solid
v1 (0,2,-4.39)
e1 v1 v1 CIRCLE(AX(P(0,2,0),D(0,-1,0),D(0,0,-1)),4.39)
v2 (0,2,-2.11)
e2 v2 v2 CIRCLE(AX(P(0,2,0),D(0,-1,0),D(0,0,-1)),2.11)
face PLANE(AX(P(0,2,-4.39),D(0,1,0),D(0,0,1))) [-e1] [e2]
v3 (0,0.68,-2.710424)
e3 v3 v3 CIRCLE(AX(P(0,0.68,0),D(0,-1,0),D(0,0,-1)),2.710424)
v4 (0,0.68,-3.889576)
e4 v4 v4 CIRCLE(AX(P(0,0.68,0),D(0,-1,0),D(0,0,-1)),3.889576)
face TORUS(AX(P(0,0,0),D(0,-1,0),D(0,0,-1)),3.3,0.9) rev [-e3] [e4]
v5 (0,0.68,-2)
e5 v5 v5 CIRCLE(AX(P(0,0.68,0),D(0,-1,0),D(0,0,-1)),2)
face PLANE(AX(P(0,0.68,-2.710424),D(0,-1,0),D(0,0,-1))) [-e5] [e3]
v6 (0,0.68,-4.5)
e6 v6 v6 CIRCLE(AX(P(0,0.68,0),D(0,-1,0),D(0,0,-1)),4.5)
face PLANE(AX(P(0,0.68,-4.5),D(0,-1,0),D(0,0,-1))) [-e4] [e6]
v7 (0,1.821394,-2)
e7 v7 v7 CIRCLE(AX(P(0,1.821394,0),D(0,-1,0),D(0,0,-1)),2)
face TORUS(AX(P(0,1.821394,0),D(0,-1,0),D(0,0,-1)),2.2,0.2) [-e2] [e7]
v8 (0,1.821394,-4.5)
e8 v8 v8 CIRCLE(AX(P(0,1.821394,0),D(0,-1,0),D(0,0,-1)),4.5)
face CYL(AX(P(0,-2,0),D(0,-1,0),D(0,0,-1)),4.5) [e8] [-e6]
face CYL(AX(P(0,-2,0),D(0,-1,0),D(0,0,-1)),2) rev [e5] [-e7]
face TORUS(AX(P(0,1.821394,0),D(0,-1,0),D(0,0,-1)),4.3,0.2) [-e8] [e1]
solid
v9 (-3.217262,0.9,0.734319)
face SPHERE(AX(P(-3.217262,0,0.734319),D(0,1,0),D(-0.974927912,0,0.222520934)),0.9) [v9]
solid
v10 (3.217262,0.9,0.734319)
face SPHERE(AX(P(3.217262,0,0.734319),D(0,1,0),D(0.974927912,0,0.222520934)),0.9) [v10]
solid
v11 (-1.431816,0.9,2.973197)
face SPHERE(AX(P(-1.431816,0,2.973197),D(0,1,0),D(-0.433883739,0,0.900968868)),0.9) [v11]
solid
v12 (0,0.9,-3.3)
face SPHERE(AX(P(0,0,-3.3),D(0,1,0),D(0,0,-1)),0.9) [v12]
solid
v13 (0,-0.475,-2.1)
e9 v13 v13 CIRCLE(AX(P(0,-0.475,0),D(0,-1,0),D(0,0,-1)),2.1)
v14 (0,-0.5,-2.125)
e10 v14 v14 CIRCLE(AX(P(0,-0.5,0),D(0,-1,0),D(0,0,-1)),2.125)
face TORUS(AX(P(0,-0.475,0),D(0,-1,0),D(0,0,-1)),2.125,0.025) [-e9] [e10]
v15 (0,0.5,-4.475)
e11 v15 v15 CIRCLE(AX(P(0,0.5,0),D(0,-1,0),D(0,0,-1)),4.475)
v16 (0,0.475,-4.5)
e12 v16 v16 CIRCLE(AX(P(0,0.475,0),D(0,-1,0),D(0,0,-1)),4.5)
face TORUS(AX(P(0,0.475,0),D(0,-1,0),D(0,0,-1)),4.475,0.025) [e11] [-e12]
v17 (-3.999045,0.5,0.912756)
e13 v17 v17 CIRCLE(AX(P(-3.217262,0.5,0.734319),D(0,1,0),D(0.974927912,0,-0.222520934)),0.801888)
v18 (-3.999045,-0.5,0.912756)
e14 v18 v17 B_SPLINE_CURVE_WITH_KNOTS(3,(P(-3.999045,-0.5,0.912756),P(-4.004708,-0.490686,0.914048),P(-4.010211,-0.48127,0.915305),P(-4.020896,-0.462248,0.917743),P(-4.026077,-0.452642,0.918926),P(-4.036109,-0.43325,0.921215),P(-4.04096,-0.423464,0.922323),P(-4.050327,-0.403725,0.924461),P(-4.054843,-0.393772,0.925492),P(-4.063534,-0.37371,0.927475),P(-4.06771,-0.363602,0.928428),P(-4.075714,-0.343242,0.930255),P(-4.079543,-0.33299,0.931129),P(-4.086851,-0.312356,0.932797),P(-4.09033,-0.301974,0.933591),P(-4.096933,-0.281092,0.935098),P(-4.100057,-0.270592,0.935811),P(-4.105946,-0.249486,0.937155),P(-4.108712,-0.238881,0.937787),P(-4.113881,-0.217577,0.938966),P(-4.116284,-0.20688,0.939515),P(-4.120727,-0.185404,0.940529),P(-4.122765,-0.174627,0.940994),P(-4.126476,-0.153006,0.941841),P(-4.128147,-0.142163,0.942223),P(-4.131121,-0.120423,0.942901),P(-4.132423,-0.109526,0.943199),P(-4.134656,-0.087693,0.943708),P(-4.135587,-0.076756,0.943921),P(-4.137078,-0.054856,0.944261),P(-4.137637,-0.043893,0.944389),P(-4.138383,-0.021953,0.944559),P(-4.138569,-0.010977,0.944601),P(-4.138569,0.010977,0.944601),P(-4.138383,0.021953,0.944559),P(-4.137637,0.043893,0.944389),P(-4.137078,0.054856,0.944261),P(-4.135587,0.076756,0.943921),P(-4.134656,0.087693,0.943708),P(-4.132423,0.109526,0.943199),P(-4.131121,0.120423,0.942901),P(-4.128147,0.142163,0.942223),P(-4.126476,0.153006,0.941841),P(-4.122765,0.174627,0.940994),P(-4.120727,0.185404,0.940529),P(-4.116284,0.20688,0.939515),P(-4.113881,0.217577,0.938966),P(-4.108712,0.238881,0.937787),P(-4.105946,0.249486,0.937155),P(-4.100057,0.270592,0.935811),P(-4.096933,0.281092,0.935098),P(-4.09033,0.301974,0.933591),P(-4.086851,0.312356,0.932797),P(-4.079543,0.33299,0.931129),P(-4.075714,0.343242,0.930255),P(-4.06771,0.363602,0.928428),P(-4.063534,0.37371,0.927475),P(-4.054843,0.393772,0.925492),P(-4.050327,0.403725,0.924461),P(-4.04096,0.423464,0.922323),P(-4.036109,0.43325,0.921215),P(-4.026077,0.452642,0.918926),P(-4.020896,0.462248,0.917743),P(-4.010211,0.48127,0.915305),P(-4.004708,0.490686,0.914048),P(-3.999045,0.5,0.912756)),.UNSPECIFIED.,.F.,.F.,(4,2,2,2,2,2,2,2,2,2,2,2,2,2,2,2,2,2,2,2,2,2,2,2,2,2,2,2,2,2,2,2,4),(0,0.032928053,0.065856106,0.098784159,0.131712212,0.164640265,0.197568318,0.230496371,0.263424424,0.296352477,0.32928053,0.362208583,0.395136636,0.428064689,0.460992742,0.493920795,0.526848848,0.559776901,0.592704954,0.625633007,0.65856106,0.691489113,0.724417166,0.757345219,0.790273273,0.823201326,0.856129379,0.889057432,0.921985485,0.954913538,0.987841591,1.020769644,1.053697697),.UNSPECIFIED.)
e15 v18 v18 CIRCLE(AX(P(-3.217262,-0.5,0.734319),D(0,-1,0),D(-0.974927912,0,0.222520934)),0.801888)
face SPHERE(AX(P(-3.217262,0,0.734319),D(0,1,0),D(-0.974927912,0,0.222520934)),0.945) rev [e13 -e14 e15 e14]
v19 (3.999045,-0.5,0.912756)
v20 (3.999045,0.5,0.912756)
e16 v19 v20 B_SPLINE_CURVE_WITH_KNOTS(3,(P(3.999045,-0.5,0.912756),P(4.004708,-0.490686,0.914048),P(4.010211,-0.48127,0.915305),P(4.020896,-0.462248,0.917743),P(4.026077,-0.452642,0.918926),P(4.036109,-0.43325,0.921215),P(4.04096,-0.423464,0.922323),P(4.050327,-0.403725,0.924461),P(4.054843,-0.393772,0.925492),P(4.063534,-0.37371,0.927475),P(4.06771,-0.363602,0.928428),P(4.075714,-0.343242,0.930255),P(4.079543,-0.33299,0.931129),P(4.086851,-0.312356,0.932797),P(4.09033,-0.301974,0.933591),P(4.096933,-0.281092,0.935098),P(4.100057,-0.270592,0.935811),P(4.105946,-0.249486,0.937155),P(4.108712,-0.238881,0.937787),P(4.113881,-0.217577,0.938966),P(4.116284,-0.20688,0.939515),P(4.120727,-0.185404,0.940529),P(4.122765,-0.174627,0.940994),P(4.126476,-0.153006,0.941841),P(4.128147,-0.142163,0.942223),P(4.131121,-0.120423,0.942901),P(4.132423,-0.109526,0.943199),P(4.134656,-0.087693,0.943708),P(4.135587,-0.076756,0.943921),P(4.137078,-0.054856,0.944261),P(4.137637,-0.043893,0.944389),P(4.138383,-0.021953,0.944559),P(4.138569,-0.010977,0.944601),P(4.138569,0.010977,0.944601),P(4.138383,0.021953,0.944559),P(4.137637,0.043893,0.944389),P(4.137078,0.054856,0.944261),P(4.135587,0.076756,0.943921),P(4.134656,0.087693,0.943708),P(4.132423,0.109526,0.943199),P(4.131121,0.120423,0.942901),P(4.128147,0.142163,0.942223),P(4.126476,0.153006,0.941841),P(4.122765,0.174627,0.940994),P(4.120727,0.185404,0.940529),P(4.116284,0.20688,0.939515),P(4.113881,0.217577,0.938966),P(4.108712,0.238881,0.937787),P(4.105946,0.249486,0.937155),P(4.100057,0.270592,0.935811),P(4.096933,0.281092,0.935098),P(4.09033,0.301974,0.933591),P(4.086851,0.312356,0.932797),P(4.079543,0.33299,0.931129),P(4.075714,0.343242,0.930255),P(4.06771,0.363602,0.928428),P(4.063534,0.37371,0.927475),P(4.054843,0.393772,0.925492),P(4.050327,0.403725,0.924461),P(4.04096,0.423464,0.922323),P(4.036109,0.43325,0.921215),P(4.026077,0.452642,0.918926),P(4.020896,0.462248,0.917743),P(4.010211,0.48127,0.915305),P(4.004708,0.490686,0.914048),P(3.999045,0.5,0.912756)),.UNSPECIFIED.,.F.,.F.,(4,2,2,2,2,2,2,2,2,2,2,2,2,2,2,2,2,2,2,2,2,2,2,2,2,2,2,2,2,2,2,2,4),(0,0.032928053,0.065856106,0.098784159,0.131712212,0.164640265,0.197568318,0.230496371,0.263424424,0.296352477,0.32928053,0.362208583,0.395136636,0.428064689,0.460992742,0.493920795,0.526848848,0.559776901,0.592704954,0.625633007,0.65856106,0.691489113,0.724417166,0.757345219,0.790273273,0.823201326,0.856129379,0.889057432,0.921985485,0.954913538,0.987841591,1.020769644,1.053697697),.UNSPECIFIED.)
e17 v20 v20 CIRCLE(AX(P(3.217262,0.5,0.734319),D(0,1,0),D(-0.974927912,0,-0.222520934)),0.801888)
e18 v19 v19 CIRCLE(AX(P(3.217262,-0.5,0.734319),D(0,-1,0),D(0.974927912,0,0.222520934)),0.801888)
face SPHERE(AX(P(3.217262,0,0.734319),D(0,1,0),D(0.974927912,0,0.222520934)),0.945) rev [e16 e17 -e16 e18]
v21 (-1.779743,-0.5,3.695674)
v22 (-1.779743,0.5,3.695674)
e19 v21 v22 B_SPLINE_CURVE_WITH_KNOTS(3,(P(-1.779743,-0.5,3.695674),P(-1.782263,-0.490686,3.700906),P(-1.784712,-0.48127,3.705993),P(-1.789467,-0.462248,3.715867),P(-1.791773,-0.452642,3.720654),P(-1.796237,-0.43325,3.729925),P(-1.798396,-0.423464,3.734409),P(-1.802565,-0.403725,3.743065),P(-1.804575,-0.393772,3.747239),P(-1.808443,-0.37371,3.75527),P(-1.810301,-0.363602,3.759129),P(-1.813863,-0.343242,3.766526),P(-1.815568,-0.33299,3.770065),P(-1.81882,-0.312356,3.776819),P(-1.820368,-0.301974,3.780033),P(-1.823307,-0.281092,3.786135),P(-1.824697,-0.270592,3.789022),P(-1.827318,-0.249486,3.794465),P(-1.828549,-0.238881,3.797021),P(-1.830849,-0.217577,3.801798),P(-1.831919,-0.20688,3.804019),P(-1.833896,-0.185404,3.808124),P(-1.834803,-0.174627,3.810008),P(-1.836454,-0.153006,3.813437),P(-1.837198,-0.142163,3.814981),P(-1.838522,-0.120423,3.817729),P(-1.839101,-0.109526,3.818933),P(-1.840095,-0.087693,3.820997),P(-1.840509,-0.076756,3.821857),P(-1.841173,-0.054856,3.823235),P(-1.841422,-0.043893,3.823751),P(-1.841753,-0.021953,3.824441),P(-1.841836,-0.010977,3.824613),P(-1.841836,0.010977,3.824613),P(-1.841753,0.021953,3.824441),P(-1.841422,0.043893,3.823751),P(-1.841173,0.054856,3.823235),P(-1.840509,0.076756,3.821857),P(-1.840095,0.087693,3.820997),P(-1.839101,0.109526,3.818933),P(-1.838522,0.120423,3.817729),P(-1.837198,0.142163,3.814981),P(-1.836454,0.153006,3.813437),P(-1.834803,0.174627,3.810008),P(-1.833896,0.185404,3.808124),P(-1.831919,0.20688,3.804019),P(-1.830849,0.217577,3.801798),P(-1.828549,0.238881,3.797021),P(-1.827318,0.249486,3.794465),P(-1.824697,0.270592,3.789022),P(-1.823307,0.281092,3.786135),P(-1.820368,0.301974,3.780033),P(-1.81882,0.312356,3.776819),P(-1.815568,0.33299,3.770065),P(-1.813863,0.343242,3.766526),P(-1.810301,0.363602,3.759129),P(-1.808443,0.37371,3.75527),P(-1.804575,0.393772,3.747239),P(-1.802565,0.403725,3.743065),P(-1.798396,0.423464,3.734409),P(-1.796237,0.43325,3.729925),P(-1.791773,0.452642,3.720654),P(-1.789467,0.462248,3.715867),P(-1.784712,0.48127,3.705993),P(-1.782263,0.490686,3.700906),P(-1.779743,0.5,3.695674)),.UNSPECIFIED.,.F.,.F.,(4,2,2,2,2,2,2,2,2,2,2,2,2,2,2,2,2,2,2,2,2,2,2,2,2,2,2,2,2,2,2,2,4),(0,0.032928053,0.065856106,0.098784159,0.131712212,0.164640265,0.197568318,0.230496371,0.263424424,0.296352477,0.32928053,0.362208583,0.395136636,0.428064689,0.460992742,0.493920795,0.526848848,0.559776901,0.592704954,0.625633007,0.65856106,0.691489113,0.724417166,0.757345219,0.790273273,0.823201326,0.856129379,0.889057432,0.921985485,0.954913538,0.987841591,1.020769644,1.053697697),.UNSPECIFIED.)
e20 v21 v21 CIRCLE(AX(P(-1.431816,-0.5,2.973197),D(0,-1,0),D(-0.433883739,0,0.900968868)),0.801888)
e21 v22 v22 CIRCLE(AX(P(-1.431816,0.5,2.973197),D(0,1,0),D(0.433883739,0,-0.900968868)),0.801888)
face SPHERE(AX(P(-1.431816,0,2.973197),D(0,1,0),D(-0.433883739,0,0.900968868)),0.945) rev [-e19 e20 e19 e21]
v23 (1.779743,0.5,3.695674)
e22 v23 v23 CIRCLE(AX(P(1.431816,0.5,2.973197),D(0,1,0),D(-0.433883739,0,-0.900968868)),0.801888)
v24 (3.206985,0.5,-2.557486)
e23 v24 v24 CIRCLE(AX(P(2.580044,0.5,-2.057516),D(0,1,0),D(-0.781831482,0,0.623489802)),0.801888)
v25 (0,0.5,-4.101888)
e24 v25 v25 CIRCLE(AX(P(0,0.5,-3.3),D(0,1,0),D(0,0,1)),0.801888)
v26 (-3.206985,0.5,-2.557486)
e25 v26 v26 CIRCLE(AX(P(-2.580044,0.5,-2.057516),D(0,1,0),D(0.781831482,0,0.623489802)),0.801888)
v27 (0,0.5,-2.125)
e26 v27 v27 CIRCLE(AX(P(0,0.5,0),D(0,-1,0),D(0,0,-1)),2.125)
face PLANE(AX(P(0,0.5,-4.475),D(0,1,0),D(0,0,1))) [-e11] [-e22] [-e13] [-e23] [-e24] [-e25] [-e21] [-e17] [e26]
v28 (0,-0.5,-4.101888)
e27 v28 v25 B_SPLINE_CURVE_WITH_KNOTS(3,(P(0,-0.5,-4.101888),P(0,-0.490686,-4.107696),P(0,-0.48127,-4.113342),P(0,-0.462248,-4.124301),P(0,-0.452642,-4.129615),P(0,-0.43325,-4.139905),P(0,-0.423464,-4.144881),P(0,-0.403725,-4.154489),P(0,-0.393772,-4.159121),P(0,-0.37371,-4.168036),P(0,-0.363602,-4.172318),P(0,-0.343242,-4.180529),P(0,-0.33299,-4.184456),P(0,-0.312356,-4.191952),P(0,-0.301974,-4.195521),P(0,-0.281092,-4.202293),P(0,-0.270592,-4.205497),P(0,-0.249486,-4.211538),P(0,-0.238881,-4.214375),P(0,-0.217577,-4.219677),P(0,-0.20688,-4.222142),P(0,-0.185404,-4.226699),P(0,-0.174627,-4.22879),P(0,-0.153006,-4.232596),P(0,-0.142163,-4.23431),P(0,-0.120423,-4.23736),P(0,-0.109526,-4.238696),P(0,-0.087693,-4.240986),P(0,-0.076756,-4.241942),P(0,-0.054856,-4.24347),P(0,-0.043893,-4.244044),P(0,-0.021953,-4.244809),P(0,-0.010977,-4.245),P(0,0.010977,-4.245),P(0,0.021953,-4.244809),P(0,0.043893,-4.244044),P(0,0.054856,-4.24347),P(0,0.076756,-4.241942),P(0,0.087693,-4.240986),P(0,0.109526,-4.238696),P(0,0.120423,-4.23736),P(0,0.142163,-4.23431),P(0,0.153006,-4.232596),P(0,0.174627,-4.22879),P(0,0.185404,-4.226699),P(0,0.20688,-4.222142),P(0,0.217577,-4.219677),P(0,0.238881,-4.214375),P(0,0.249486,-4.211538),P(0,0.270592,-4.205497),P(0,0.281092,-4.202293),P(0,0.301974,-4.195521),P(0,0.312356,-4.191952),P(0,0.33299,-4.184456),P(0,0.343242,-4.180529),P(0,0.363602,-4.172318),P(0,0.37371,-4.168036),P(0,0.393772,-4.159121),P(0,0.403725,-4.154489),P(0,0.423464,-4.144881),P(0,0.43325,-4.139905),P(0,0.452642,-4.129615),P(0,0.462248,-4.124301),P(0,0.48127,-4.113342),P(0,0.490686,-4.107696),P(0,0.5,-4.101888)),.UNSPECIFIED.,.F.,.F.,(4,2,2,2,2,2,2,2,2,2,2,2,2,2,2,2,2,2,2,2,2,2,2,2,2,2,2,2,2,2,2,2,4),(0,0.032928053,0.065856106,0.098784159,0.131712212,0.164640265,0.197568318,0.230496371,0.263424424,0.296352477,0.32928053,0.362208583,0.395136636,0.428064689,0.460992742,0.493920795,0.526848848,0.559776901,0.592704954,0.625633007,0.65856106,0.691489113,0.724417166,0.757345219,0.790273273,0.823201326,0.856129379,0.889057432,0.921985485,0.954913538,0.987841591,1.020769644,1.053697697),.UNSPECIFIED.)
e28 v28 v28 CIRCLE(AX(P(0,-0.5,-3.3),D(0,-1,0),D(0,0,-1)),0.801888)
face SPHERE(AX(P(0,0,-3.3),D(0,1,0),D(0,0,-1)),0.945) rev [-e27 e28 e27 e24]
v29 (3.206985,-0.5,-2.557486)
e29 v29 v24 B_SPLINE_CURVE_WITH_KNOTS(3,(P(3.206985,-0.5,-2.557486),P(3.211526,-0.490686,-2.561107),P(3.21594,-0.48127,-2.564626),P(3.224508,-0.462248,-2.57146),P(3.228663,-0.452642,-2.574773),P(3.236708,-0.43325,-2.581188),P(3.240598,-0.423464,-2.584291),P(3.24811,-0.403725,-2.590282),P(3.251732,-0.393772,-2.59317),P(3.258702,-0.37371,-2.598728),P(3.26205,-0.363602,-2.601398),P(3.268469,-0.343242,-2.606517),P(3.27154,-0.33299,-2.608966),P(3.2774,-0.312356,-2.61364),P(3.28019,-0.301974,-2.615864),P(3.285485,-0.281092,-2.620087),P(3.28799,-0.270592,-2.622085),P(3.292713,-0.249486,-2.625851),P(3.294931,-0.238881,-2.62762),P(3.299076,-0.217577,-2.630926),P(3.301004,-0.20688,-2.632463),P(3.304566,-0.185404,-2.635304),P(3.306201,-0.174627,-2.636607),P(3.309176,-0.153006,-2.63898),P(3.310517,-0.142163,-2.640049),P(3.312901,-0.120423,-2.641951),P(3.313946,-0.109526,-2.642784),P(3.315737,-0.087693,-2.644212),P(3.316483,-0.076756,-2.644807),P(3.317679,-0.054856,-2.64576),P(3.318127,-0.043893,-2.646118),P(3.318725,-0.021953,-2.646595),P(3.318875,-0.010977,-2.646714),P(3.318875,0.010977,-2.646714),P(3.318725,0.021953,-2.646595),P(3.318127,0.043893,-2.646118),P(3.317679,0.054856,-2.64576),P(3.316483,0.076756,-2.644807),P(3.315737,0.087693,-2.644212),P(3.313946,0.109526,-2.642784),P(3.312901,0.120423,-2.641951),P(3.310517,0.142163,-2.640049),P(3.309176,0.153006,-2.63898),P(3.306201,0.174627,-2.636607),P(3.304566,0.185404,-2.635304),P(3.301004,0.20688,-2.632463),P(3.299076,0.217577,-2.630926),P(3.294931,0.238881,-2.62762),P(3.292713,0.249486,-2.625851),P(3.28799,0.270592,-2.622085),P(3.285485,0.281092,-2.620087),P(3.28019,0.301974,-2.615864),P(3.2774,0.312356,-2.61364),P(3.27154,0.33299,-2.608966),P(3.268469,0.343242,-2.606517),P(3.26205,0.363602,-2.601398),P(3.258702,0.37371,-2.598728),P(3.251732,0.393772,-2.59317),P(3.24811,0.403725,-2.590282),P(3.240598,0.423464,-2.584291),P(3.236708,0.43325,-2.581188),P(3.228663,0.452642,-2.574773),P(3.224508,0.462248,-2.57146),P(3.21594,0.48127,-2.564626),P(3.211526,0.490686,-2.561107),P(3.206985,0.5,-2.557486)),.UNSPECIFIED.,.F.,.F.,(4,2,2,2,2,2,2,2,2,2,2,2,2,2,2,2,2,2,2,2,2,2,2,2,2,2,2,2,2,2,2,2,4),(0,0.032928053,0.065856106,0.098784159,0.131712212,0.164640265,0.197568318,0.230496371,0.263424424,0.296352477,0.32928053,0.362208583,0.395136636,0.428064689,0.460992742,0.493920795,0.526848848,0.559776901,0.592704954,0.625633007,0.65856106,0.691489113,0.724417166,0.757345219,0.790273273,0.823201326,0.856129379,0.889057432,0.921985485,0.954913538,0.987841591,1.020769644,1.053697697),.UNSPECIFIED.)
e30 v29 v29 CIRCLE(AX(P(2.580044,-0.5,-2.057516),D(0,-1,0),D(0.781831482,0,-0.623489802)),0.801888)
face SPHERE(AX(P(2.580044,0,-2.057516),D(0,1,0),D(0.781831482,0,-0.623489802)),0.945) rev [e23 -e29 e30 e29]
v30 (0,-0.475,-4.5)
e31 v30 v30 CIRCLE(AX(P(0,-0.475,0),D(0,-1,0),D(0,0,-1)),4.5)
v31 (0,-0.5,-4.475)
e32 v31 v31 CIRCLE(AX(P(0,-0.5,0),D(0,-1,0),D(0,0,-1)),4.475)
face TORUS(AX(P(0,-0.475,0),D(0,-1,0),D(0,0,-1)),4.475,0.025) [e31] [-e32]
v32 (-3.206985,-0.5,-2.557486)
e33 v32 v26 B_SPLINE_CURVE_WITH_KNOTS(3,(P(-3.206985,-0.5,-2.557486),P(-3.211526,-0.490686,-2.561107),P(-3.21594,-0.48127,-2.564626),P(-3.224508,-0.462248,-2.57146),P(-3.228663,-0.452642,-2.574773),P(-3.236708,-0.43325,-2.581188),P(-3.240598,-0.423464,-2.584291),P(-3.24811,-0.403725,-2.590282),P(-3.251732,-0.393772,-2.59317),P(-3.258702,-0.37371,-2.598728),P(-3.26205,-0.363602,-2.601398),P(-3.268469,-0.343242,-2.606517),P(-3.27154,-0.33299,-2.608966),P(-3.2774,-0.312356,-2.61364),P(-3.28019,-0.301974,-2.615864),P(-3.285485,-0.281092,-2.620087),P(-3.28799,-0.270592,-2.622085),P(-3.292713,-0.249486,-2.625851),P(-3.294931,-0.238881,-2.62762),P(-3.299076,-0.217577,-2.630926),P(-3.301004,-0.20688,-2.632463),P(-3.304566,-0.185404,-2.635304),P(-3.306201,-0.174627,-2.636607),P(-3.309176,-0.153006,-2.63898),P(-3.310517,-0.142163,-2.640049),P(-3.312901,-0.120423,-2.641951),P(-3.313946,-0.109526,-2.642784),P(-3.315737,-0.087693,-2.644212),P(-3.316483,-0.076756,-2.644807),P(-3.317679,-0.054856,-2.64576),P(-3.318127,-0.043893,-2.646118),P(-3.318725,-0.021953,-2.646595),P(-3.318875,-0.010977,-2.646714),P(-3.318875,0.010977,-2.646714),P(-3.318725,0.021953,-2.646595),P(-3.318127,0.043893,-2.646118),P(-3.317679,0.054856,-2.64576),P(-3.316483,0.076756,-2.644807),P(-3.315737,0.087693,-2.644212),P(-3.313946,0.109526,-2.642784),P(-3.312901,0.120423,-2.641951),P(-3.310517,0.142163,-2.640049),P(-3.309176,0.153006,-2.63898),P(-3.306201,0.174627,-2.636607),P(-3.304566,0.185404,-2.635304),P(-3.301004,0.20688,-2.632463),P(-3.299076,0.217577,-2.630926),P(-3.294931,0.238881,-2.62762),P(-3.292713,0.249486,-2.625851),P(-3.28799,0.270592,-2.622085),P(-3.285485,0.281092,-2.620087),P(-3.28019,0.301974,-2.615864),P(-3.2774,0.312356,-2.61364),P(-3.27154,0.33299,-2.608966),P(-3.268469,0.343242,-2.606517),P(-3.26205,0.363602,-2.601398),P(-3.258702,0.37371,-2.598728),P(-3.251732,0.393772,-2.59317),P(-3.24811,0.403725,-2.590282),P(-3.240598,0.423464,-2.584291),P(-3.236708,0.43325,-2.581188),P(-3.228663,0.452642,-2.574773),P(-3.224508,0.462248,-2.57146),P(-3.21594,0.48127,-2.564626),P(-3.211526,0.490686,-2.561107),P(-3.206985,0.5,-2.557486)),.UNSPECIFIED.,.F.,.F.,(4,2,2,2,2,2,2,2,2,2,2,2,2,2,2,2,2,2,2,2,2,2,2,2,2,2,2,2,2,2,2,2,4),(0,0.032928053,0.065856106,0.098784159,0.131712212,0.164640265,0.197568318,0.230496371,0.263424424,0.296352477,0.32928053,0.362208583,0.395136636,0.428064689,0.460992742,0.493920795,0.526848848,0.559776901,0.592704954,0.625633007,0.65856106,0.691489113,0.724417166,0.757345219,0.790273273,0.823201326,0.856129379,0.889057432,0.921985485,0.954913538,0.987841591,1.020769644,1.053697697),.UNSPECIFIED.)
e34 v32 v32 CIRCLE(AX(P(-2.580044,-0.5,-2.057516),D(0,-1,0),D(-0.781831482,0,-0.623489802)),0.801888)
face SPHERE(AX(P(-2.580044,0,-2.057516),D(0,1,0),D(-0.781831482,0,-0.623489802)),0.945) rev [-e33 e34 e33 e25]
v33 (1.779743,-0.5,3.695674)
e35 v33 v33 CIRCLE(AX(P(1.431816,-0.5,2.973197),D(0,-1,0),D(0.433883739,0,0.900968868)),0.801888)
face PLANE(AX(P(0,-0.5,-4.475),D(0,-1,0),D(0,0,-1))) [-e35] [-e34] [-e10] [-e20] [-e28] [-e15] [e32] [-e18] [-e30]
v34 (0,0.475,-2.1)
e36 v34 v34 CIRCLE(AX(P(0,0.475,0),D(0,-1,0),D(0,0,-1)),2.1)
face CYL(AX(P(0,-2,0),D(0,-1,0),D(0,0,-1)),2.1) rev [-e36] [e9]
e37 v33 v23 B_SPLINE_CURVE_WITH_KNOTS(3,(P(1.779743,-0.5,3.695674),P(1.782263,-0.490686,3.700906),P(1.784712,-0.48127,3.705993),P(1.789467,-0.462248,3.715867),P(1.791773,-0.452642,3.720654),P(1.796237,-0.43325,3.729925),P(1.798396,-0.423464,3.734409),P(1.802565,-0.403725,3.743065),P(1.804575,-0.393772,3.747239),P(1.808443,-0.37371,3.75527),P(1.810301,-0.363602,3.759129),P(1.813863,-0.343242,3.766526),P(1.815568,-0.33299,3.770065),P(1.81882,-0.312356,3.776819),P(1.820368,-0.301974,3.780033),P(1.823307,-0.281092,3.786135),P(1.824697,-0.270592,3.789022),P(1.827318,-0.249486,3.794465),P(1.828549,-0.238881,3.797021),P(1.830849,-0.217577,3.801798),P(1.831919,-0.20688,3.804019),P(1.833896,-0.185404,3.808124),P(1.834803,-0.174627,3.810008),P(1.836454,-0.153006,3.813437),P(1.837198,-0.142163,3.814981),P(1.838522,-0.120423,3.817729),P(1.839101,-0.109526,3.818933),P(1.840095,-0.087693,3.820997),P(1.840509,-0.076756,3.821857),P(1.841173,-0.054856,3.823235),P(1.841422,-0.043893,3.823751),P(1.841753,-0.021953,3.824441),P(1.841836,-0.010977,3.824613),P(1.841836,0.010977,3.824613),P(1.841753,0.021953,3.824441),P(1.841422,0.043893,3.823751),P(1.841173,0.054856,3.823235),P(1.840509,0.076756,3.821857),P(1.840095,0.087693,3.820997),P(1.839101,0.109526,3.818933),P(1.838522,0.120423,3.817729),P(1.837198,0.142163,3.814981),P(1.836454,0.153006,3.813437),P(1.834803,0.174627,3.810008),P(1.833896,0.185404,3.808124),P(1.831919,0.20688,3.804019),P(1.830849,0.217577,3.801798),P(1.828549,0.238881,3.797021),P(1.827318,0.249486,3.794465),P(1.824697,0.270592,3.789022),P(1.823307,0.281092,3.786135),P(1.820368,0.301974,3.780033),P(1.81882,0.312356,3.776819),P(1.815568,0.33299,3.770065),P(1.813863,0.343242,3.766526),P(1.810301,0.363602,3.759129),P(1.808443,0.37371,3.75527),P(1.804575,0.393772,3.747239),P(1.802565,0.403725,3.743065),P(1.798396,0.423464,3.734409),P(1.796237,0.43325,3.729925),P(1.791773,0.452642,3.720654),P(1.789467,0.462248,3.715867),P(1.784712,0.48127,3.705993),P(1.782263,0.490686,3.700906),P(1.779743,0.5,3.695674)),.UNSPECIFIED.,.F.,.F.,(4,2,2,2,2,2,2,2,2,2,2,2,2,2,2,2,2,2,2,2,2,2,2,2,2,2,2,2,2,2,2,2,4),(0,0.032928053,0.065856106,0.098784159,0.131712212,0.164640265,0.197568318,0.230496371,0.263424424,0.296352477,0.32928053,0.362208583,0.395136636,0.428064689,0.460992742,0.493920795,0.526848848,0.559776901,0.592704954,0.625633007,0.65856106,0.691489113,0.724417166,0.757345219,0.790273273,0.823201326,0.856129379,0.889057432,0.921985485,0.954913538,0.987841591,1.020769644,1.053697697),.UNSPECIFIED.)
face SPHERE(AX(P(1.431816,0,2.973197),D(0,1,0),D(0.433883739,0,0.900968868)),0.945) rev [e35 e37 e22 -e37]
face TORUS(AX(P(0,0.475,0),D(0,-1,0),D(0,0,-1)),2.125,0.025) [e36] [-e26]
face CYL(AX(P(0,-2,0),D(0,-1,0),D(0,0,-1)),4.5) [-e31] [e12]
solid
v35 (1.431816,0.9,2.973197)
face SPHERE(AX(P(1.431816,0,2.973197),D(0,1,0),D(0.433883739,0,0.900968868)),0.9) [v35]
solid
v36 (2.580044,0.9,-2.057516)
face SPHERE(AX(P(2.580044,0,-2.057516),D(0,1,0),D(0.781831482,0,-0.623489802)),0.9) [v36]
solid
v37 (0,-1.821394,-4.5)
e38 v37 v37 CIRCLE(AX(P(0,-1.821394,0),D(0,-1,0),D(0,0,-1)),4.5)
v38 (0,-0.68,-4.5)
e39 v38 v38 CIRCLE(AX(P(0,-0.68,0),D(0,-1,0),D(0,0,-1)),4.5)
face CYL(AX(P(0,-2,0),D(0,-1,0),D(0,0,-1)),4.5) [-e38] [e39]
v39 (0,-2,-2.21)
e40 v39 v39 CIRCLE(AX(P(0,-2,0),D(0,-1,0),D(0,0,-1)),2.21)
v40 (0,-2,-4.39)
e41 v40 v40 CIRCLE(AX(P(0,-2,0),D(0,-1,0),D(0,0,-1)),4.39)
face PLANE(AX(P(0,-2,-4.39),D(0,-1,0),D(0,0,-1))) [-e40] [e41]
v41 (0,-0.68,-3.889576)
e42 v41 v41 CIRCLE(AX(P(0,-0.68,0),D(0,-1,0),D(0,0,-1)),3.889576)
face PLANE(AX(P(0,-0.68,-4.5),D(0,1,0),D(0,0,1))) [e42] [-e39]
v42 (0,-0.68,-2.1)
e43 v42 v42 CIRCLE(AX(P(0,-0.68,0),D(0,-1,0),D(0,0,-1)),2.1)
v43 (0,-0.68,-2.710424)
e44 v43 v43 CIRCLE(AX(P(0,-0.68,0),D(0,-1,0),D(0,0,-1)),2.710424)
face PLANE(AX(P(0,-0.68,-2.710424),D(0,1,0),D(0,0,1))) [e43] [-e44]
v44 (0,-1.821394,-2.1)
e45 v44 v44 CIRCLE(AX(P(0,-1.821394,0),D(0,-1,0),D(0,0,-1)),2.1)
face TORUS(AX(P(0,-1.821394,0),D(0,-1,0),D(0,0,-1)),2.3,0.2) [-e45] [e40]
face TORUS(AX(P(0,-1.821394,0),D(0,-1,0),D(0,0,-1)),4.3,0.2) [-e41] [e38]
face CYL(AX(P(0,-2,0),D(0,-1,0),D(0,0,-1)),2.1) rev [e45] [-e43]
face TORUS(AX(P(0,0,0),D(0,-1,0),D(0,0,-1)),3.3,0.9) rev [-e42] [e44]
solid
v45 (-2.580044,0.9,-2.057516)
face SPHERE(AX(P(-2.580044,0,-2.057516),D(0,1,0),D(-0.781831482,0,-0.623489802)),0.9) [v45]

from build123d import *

# Parameters (mm, degrees)
CIRPATTERN1_COUNT = 7
CIRPATTERN2_COUNT = 7


# Read off the part's stored shape, not the designer's step: Cut-Revolve1
with BuildPart() as part:
    # Sketch3 → Revolve1 (revolve)
    with BuildSketch(Plane(origin=(0, 0, 0), x_dir=(0, 0, -1), z_dir=(1, 0, 0))):
        with BuildLine():
            Line((4.5, 0.68), (3.889576119, 0.68))
            ThreePointArc((3.889576119, 0.68), (3.3, 0.9), (2.710423881, 0.68))
            Line((2.710423881, 0.68), (2, 0.68))
            Line((2, 0.68), (2, 1.821394289))
            ThreePointArc((2, 1.821394289), (2.029706136, 1.926275174), (2.11, 2))
            Line((2.11, 2), (4.39, 2))
            ThreePointArc((4.39, 2), (4.470293864, 1.926275174), (4.5, 1.821394289))
            Line((4.5, 1.821394289), (4.5, 0.68))
        make_face()
        with BuildLine():
            Line((2.710423881, -0.68), (2.1, -0.68))
            Line((2.1, -0.68), (2.1, -1.821394289))
            ThreePointArc((2.1, -1.821394289), (2.129706136, -1.926275174), (2.21, -2))
            Line((2.21, -2), (4.39, -2))
            ThreePointArc((4.39, -2), (4.470293864, -1.926275174), (4.5, -1.821394289))
            Line((4.5, -1.821394289), (4.5, -0.68))
            Line((4.5, -0.68), (3.889576119, -0.68))
            ThreePointArc((3.889576119, -0.68), (3.3, -0.9), (2.710423881, -0.68))
        make_face()
        with BuildLine():
            Line((4.475, 0.5), (2.125, 0.5))
            ThreePointArc((2.125, 0.5), (2.10732233, 0.49267767), (2.1, 0.475))
            Line((2.1, 0.475), (2.1, -0.475))
            ThreePointArc((2.1, -0.475), (2.10732233, -0.49267767), (2.125, -0.5))
            Line((2.125, -0.5), (4.475, -0.5))
            ThreePointArc((4.475, -0.5), (4.49267767, -0.49267767), (4.5, -0.475))
            Line((4.5, -0.475), (4.5, 0.475))
            ThreePointArc((4.5, 0.475), (4.49267767, 0.49267767), (4.475, 0.5))
        make_face()
    revolve(axis=Axis((0, -2, 0), (0, 1, 0)))

    # Cut-Revolve1 outline → Cut-Revolve1 (revolve, cut)
    with BuildSketch(Plane.XY.offset(-3.3)):
        with BuildLine():
            Line((0.801888396, 0.500000001), (0, 0.500000001))
            Line((0, 0.500000001), (0, -0.500000001))
            Line((0, -0.500000001), (0.801888396, -0.500000001))
            ThreePointArc((0.801888396, -0.500000001), (0.945, 0), (0.801888396, 0.500000001))
        make_face()
    cut_revolve1 = revolve(axis=Axis((0, 0, -3.3), (0, 1, 0)), mode=Mode.SUBTRACT)

    # CirPattern2: Cut-Revolve1 ×7 about axis
    cirpattern2_axis = Axis((0, 0, 0), (0, 1, 0))
    for i in range(1, CIRPATTERN2_COUNT):
        add(cut_revolve1.rotate(cirpattern2_axis, i * 360 / CIRPATTERN2_COUNT), mode=Mode.SUBTRACT)


with BuildPart() as body_2:
    # Sketch4 → Revolve2 (revolve)
    with BuildSketch(Plane(origin=(0, 0, 0), x_dir=(0, 0, -1), z_dir=(1, 0, 0))):
        with BuildLine():
            Line((3.3, -0.9), (3.3, 0.9))
            ThreePointArc((3.3, 0.9), (2.4, 0), (3.3, -0.9))
        make_face()
    revolve(axis=Axis((0, 2, -3.3), (0, -1, 0)))


with BuildPart() as cirpattern1_1:
    # CirPattern1: pattern copy
    add(body_2.part.rotate(Axis((0, 0, 0), (0, 1, 0)), 1 * 360 / CIRPATTERN1_COUNT))


with BuildPart() as cirpattern1_2:
    # CirPattern1: pattern copy
    add(body_2.part.rotate(Axis((0, 0, 0), (0, 1, 0)), 2 * 360 / CIRPATTERN1_COUNT))


with BuildPart() as cirpattern1_3:
    # CirPattern1: pattern copy
    add(body_2.part.rotate(Axis((0, 0, 0), (0, 1, 0)), 3 * 360 / CIRPATTERN1_COUNT))


with BuildPart() as cirpattern1_4:
    # CirPattern1: pattern copy
    add(body_2.part.rotate(Axis((0, 0, 0), (0, 1, 0)), 4 * 360 / CIRPATTERN1_COUNT))


with BuildPart() as cirpattern1_5:
    # CirPattern1: pattern copy
    add(body_2.part.rotate(Axis((0, 0, 0), (0, 1, 0)), 5 * 360 / CIRPATTERN1_COUNT))


with BuildPart() as cirpattern1_6:
    # CirPattern1: pattern copy
    add(body_2.part.rotate(Axis((0, 0, 0), (0, 1, 0)), 6 * 360 / CIRPATTERN1_COUNT))


solid = Compound([part.part, body_2.part, cirpattern1_1.part, cirpattern1_2.part, cirpattern1_3.part, cirpattern1_4.part, cirpattern1_5.part, cirpattern1_6.part])
